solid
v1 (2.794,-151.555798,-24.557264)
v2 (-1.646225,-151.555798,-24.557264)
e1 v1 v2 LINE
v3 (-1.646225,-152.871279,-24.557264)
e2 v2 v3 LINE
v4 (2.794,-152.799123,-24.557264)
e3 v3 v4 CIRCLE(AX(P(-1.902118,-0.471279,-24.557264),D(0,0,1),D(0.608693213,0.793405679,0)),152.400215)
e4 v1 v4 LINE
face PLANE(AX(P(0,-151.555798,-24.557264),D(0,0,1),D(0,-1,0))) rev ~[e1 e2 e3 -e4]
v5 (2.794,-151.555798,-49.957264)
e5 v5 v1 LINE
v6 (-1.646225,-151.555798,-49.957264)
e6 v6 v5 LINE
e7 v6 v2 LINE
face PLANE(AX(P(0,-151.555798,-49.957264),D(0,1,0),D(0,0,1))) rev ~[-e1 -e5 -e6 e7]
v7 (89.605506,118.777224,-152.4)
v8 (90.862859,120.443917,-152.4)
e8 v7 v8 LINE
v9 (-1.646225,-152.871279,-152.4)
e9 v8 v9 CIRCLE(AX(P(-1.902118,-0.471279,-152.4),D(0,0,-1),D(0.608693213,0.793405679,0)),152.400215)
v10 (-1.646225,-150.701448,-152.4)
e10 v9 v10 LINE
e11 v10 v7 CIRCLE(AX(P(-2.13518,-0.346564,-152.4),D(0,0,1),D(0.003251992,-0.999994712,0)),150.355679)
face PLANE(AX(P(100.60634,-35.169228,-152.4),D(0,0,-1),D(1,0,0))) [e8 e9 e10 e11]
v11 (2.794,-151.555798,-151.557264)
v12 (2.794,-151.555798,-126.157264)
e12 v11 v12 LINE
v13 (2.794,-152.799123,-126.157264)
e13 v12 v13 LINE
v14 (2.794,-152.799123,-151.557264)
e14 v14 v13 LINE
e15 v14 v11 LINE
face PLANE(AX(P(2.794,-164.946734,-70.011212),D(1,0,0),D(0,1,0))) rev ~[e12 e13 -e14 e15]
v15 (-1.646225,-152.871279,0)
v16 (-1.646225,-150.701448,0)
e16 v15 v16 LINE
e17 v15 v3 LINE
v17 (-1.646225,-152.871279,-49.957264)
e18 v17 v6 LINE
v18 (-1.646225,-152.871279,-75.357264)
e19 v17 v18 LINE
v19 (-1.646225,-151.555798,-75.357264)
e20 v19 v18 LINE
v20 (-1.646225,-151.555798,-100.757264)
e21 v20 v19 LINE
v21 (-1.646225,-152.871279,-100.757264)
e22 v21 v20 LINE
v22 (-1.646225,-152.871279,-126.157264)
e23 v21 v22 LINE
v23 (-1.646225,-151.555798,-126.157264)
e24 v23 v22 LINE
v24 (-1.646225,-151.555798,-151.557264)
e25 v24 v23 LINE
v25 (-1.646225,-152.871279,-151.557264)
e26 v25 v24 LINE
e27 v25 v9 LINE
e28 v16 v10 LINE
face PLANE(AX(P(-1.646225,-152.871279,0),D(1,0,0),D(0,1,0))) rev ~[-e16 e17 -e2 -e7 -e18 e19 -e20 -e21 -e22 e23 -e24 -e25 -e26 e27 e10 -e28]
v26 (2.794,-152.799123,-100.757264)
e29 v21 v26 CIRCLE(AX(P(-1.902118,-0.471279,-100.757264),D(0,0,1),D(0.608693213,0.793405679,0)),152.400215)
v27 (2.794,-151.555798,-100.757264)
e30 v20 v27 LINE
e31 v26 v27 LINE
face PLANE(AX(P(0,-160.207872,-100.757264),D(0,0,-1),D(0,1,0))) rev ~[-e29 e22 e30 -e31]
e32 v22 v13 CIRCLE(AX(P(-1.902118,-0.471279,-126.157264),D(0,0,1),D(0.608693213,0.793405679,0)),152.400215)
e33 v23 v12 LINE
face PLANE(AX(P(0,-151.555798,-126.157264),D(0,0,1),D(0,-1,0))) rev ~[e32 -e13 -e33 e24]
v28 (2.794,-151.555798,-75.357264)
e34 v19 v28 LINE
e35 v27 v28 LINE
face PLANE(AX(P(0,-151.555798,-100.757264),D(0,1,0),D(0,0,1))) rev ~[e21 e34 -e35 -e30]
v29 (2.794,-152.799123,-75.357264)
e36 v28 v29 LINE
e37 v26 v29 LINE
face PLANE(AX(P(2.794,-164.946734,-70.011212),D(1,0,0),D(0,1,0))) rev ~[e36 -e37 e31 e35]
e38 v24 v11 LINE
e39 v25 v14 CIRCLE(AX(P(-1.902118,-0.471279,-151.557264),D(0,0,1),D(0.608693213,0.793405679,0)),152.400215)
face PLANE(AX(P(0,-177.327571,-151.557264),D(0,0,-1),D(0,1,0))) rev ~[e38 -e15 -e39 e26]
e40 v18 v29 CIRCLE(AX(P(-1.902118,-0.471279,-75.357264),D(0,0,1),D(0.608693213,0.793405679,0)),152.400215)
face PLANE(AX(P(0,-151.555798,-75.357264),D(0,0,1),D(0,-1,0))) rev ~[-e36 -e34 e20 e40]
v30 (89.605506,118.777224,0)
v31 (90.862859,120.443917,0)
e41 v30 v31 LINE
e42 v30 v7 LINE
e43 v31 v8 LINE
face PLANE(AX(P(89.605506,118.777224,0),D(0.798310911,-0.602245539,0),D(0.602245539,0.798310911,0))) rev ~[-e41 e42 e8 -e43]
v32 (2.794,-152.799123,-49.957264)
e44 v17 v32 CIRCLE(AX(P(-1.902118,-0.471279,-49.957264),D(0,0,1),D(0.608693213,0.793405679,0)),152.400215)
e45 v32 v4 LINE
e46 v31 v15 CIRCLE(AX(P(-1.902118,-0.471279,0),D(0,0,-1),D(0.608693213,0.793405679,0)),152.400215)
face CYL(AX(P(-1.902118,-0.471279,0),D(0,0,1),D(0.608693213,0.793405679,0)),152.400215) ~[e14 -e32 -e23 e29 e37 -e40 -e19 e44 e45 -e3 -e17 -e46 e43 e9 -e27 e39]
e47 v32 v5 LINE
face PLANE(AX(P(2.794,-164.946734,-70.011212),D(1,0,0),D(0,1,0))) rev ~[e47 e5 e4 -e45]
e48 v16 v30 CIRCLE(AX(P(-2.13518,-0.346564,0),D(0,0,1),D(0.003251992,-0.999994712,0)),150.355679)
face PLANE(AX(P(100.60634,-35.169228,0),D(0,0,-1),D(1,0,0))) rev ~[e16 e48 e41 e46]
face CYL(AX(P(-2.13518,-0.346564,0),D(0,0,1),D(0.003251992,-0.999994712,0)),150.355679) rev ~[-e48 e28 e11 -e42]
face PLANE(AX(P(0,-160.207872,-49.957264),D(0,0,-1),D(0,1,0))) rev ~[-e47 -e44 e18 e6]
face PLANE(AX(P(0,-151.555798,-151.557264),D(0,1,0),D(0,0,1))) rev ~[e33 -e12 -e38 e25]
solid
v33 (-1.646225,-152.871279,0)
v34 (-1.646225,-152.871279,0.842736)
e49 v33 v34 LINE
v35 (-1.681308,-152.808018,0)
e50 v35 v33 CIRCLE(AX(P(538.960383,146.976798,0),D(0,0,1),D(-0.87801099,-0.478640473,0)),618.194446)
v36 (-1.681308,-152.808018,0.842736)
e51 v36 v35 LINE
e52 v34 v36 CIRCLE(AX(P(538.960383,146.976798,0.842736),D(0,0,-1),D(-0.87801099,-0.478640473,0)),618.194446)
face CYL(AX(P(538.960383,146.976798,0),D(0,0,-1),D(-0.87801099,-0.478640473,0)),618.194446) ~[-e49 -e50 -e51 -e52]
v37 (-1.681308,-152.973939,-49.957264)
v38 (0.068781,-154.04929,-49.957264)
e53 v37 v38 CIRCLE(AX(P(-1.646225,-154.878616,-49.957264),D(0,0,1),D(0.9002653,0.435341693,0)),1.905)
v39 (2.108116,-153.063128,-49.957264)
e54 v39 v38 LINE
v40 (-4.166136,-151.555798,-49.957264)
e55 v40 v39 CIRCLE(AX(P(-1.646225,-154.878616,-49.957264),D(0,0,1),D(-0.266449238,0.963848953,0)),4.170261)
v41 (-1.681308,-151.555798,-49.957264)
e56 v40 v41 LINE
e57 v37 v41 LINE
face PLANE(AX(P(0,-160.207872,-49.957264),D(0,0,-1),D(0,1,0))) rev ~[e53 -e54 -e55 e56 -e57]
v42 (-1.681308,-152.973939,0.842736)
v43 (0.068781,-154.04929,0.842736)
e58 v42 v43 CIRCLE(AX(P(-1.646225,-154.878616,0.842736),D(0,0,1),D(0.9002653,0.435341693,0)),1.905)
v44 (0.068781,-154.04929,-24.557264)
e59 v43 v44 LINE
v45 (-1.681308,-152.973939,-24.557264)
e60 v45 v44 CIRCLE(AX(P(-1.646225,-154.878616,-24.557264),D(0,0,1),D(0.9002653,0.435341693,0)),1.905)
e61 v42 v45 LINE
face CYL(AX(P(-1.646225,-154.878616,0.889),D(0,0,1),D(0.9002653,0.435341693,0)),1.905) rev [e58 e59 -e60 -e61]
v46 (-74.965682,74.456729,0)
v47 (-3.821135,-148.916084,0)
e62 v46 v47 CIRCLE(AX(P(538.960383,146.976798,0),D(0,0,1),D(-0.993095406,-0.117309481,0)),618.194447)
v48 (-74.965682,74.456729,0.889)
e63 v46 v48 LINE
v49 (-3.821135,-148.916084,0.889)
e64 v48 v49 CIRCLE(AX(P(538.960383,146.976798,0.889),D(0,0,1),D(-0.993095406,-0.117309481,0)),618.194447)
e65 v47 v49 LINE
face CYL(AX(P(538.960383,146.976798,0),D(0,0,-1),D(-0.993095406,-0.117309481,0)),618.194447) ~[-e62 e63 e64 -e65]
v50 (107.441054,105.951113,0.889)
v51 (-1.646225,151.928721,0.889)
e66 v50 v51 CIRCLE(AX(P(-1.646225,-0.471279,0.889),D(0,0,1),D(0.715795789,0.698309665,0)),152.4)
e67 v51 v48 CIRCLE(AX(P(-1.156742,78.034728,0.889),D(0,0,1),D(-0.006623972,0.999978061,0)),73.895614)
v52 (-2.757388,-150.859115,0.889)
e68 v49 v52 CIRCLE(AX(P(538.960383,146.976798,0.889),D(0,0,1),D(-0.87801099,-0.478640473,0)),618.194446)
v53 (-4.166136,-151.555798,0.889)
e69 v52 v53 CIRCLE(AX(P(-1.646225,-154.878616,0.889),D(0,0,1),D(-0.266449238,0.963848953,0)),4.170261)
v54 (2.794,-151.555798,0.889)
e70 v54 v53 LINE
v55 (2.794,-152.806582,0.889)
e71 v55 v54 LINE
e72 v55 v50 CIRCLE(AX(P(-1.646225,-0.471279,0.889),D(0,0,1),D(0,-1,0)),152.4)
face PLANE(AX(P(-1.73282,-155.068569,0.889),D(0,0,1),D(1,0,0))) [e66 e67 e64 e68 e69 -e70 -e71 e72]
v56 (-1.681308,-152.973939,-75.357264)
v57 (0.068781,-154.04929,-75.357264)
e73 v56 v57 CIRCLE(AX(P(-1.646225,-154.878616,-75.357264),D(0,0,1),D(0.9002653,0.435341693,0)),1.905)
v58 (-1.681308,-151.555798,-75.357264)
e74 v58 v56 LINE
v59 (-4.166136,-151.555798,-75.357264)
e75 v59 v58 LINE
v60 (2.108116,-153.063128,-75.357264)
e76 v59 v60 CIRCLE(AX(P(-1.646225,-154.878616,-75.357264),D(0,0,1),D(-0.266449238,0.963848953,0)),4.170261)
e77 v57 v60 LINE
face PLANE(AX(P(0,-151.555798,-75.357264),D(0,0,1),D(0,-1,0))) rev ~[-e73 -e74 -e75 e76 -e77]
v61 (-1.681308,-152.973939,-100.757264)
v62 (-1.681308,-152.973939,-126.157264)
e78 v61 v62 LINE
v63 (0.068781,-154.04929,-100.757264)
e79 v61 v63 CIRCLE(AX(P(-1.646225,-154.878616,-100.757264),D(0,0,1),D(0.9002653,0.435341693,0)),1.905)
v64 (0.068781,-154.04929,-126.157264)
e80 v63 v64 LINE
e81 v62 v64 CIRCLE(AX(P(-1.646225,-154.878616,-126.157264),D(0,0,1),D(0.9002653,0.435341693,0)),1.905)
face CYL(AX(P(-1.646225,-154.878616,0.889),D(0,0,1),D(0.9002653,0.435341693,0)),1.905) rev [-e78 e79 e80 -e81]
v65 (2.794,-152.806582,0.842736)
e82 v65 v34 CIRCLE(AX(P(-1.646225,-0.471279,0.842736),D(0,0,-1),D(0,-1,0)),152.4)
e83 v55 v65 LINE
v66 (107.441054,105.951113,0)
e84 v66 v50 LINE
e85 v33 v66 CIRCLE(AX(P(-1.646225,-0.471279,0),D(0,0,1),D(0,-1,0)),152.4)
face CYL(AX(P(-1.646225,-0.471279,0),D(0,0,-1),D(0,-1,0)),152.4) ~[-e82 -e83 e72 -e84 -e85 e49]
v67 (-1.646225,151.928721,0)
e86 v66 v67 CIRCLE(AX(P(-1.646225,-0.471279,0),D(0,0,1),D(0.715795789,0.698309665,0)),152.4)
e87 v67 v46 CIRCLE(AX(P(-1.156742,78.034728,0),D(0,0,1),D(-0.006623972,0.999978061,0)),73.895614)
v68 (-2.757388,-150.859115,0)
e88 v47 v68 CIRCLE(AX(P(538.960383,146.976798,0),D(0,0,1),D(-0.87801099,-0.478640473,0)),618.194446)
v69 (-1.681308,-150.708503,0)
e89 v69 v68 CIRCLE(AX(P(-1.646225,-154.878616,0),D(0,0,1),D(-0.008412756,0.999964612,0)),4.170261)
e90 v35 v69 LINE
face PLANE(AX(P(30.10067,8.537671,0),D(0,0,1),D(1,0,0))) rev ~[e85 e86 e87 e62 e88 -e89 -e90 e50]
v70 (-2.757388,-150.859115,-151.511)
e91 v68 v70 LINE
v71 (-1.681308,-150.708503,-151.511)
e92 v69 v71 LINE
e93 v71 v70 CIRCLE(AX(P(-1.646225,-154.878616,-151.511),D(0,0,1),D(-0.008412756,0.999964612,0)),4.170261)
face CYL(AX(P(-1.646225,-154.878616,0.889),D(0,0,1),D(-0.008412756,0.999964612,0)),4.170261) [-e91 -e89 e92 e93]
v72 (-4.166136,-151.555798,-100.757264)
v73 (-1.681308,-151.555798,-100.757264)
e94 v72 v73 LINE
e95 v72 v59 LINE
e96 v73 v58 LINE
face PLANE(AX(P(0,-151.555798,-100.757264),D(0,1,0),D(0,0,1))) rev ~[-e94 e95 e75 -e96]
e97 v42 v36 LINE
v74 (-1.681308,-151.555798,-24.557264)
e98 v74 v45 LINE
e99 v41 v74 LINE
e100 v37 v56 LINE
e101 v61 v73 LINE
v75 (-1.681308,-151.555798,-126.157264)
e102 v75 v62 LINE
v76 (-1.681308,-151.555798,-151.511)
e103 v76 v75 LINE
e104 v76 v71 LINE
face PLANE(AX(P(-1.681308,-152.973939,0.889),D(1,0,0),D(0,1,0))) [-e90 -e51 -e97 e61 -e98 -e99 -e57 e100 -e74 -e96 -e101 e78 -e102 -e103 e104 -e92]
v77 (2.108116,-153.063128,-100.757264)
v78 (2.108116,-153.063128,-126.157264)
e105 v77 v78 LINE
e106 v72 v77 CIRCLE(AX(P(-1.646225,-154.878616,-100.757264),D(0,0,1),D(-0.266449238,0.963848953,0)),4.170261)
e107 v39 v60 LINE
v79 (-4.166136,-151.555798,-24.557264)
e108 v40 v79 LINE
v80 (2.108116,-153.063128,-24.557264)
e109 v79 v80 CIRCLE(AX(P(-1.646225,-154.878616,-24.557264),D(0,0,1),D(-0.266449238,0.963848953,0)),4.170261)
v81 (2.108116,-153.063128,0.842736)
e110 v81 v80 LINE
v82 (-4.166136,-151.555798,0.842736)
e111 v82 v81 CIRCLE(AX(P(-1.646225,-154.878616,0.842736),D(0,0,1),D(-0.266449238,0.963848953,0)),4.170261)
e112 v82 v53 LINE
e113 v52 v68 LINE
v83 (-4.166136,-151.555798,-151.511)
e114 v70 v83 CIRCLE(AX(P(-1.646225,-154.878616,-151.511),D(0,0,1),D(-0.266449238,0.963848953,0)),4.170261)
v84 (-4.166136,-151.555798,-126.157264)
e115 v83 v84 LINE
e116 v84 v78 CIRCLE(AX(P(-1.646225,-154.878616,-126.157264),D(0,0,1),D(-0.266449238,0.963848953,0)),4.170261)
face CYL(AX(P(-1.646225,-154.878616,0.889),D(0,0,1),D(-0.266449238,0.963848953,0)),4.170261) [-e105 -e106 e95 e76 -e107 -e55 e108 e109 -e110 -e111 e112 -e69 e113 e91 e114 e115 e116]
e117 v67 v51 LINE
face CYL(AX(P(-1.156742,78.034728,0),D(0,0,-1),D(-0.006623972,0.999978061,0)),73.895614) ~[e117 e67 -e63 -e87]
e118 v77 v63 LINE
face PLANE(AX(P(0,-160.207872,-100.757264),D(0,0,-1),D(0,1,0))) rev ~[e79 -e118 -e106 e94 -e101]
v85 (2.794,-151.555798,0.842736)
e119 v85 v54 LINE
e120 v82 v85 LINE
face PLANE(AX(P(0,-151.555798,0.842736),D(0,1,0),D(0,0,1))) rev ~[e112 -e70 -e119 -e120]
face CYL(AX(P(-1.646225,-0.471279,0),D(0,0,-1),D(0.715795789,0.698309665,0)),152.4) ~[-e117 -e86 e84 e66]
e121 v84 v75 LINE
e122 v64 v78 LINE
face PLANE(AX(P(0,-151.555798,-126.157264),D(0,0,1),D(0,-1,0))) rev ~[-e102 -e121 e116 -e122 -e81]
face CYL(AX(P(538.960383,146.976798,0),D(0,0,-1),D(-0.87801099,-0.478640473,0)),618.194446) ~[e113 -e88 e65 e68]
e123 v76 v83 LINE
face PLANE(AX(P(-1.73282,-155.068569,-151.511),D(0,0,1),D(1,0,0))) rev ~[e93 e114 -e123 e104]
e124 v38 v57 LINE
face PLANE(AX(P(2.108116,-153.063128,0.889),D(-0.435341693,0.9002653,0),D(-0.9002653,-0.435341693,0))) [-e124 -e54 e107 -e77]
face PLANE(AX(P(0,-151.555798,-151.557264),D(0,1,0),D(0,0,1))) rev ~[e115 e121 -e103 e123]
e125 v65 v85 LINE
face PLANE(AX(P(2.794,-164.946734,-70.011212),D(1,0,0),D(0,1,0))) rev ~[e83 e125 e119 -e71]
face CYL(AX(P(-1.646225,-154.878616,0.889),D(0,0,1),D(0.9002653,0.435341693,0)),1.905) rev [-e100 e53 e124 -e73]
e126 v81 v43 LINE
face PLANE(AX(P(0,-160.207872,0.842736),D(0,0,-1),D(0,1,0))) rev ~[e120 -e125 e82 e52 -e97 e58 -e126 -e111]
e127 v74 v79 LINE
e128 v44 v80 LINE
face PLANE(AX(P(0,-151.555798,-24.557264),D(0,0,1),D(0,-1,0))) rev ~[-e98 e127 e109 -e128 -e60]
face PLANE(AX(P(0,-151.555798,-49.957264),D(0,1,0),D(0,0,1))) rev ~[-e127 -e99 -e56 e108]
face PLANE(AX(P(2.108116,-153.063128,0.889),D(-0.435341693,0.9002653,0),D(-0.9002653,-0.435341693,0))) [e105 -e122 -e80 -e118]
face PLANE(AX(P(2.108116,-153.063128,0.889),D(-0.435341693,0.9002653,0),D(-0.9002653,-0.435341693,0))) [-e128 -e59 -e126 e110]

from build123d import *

# Parameters (mm, degrees)
F1_DEPTH      = 0.889
F3_DEPTH      = 152.4
F5_DEPTH      = 152.4
F7_DEPTH      = 2.794
F7_DEPTH_BACK = 25.4


with BuildPart() as f1:
    # F0 (on Top) → F1 (new body)
    with BuildSketch(Plane.XY):
        with BuildLine():
            Line((104.8647104191, 103.4104977604), (107.4410535939, 105.9511134646))
            ThreePointArc((107.4410535939, 105.9511134646), (57.5440925804, 139.9647071727), (-1.646224697, 151.9287205432))
            ThreePointArc((-1.646224697, 151.9287205432), (-54.8274165052, 128.8286295835), (-74.9656821683, 74.4567285632))
            ThreePointArc((-74.9656821683, 74.4567285632), (-50.0786323185, -40.6329360959), (-3.82113499, -148.9160839189))
            ThreePointArc((-3.82113499, -148.9160839189), (134.5057048325, -58.9275907244), (104.8647104191, 103.4104977604))
        make_face()
        with BuildLine():
            ThreePointArc((-3.82113499, -148.9160839189), (-2.7372897039, -150.8956667029), (-1.646224697, -152.8712794568))
            ThreePointArc((-1.646224697, -152.8712794568), (138.7897619326, -59.6615967341), (107.4410535939, 105.9511134646))
            Line((107.4410535939, 105.9511134646), (104.8647104191, 103.4104977604))
            ThreePointArc((104.8647104191, 103.4104977604), (134.5057048325, -58.9275907244), (-3.82113499, -148.9160839189))
        make_face()
    extrude(amount=F1_DEPTH)

    # F4 (on face) → F5 (join)
    with BuildSketch(Plane.XY.offset(0.889)):
        with BuildLine():
            ThreePointArc((0.0687806999, -154.0492904087), (-2.6435357958, -156.5016984542), (-1.681308085, -152.9739394166))
            Line((-1.681308085, -152.9739394166), (-1.681308085, -152.8080176611))
            ThreePointArc((-1.681308085, -152.8080176611), (-2.2202251071, -151.834050614), (-2.7573875275, -150.8591147702))
            ThreePointArc((-2.7573875275, -150.8591147702), (-3.3669851054, -158.6773081165), (2.108116449, -153.0631279113))
            Line((2.108116449, -153.0631279113), (0.0687806999, -154.0492904087))
        make_face()
        with BuildLine():
            ThreePointArc((-2.7573875275, -150.8591147702), (-2.2202251071, -151.834050614), (-1.681308085, -152.8080176611))
            Line((-1.681308085, -152.8080176611), (-1.681308085, -150.7085030485))
            ThreePointArc((-1.681308085, -150.7085030485), (-2.2242740643, -150.7486121468), (-2.7573875275, -150.8591147702))
        make_face()
    extrude(amount=-F5_DEPTH)


with BuildPart() as f3:
    # F2 (on face) → F3 (new body)
    with BuildSketch(Plane(origin=(0, 0, 0), x_dir=(1, 0, 0), z_dir=(0, 0, -1))):
        with BuildLine():
            Line((89.605505981, -118.7772235698), (90.8628587214, -120.4439165471))
            ThreePointArc((90.8628587214, -120.4439165471), (142.4534143114, 49.3313434088), (-1.646224697, 152.8712794568))
            Line((-1.646224697, 152.8712794568), (-1.646224697, 150.7014483213))
            ThreePointArc((-1.646224697, 150.7014483213), (140.2771274439, 48.5706756767), (89.605505981, -118.7772235698))
        make_face()
    extrude(amount=F3_DEPTH)


with BuildPart() as f7_tool:
    # F6 (on Right) → F7 (new body, two sides)
    with BuildSketch(Plane.YZ) as f7_sk:
        Polygon((-160.2078721456, 0.8427356878), (-151.5557976027, 0.8427356878), (-151.5557976027, 9.4913730934), (-177.3275714077, 9.4913730934), (-177.3275714077, -151.5572643122), (-151.5557976027, -151.5572643122), (-151.5557976027, -126.1572643122), (-160.2078721456, -126.1572643122), (-160.2078721456, -100.7572643122), (-151.5557976027, -100.7572643122), (-151.5557976027, -75.3572643122), (-160.2078721456, -75.3572643122), (-160.2078721456, -49.9572643122), (-151.5557976027, -49.9572643122), (-151.5557976027, -24.5572643122), (-160.2078721456, -24.5572643122), align=None)
    extrude(amount=F7_DEPTH)
    extrude(f7_sk.sketch, amount=-F7_DEPTH_BACK)


with BuildPart() as f1_1:
    add(f1.part)

    # F7: cut by f7_tool
    add(f7_tool.part, mode=Mode.SUBTRACT)


with BuildPart() as f3_1:
    add(f3.part)

    # F7: cut by f7_tool
    add(f7_tool.part, mode=Mode.SUBTRACT)


solid = Compound([f1_1.part, f3_1.part])
